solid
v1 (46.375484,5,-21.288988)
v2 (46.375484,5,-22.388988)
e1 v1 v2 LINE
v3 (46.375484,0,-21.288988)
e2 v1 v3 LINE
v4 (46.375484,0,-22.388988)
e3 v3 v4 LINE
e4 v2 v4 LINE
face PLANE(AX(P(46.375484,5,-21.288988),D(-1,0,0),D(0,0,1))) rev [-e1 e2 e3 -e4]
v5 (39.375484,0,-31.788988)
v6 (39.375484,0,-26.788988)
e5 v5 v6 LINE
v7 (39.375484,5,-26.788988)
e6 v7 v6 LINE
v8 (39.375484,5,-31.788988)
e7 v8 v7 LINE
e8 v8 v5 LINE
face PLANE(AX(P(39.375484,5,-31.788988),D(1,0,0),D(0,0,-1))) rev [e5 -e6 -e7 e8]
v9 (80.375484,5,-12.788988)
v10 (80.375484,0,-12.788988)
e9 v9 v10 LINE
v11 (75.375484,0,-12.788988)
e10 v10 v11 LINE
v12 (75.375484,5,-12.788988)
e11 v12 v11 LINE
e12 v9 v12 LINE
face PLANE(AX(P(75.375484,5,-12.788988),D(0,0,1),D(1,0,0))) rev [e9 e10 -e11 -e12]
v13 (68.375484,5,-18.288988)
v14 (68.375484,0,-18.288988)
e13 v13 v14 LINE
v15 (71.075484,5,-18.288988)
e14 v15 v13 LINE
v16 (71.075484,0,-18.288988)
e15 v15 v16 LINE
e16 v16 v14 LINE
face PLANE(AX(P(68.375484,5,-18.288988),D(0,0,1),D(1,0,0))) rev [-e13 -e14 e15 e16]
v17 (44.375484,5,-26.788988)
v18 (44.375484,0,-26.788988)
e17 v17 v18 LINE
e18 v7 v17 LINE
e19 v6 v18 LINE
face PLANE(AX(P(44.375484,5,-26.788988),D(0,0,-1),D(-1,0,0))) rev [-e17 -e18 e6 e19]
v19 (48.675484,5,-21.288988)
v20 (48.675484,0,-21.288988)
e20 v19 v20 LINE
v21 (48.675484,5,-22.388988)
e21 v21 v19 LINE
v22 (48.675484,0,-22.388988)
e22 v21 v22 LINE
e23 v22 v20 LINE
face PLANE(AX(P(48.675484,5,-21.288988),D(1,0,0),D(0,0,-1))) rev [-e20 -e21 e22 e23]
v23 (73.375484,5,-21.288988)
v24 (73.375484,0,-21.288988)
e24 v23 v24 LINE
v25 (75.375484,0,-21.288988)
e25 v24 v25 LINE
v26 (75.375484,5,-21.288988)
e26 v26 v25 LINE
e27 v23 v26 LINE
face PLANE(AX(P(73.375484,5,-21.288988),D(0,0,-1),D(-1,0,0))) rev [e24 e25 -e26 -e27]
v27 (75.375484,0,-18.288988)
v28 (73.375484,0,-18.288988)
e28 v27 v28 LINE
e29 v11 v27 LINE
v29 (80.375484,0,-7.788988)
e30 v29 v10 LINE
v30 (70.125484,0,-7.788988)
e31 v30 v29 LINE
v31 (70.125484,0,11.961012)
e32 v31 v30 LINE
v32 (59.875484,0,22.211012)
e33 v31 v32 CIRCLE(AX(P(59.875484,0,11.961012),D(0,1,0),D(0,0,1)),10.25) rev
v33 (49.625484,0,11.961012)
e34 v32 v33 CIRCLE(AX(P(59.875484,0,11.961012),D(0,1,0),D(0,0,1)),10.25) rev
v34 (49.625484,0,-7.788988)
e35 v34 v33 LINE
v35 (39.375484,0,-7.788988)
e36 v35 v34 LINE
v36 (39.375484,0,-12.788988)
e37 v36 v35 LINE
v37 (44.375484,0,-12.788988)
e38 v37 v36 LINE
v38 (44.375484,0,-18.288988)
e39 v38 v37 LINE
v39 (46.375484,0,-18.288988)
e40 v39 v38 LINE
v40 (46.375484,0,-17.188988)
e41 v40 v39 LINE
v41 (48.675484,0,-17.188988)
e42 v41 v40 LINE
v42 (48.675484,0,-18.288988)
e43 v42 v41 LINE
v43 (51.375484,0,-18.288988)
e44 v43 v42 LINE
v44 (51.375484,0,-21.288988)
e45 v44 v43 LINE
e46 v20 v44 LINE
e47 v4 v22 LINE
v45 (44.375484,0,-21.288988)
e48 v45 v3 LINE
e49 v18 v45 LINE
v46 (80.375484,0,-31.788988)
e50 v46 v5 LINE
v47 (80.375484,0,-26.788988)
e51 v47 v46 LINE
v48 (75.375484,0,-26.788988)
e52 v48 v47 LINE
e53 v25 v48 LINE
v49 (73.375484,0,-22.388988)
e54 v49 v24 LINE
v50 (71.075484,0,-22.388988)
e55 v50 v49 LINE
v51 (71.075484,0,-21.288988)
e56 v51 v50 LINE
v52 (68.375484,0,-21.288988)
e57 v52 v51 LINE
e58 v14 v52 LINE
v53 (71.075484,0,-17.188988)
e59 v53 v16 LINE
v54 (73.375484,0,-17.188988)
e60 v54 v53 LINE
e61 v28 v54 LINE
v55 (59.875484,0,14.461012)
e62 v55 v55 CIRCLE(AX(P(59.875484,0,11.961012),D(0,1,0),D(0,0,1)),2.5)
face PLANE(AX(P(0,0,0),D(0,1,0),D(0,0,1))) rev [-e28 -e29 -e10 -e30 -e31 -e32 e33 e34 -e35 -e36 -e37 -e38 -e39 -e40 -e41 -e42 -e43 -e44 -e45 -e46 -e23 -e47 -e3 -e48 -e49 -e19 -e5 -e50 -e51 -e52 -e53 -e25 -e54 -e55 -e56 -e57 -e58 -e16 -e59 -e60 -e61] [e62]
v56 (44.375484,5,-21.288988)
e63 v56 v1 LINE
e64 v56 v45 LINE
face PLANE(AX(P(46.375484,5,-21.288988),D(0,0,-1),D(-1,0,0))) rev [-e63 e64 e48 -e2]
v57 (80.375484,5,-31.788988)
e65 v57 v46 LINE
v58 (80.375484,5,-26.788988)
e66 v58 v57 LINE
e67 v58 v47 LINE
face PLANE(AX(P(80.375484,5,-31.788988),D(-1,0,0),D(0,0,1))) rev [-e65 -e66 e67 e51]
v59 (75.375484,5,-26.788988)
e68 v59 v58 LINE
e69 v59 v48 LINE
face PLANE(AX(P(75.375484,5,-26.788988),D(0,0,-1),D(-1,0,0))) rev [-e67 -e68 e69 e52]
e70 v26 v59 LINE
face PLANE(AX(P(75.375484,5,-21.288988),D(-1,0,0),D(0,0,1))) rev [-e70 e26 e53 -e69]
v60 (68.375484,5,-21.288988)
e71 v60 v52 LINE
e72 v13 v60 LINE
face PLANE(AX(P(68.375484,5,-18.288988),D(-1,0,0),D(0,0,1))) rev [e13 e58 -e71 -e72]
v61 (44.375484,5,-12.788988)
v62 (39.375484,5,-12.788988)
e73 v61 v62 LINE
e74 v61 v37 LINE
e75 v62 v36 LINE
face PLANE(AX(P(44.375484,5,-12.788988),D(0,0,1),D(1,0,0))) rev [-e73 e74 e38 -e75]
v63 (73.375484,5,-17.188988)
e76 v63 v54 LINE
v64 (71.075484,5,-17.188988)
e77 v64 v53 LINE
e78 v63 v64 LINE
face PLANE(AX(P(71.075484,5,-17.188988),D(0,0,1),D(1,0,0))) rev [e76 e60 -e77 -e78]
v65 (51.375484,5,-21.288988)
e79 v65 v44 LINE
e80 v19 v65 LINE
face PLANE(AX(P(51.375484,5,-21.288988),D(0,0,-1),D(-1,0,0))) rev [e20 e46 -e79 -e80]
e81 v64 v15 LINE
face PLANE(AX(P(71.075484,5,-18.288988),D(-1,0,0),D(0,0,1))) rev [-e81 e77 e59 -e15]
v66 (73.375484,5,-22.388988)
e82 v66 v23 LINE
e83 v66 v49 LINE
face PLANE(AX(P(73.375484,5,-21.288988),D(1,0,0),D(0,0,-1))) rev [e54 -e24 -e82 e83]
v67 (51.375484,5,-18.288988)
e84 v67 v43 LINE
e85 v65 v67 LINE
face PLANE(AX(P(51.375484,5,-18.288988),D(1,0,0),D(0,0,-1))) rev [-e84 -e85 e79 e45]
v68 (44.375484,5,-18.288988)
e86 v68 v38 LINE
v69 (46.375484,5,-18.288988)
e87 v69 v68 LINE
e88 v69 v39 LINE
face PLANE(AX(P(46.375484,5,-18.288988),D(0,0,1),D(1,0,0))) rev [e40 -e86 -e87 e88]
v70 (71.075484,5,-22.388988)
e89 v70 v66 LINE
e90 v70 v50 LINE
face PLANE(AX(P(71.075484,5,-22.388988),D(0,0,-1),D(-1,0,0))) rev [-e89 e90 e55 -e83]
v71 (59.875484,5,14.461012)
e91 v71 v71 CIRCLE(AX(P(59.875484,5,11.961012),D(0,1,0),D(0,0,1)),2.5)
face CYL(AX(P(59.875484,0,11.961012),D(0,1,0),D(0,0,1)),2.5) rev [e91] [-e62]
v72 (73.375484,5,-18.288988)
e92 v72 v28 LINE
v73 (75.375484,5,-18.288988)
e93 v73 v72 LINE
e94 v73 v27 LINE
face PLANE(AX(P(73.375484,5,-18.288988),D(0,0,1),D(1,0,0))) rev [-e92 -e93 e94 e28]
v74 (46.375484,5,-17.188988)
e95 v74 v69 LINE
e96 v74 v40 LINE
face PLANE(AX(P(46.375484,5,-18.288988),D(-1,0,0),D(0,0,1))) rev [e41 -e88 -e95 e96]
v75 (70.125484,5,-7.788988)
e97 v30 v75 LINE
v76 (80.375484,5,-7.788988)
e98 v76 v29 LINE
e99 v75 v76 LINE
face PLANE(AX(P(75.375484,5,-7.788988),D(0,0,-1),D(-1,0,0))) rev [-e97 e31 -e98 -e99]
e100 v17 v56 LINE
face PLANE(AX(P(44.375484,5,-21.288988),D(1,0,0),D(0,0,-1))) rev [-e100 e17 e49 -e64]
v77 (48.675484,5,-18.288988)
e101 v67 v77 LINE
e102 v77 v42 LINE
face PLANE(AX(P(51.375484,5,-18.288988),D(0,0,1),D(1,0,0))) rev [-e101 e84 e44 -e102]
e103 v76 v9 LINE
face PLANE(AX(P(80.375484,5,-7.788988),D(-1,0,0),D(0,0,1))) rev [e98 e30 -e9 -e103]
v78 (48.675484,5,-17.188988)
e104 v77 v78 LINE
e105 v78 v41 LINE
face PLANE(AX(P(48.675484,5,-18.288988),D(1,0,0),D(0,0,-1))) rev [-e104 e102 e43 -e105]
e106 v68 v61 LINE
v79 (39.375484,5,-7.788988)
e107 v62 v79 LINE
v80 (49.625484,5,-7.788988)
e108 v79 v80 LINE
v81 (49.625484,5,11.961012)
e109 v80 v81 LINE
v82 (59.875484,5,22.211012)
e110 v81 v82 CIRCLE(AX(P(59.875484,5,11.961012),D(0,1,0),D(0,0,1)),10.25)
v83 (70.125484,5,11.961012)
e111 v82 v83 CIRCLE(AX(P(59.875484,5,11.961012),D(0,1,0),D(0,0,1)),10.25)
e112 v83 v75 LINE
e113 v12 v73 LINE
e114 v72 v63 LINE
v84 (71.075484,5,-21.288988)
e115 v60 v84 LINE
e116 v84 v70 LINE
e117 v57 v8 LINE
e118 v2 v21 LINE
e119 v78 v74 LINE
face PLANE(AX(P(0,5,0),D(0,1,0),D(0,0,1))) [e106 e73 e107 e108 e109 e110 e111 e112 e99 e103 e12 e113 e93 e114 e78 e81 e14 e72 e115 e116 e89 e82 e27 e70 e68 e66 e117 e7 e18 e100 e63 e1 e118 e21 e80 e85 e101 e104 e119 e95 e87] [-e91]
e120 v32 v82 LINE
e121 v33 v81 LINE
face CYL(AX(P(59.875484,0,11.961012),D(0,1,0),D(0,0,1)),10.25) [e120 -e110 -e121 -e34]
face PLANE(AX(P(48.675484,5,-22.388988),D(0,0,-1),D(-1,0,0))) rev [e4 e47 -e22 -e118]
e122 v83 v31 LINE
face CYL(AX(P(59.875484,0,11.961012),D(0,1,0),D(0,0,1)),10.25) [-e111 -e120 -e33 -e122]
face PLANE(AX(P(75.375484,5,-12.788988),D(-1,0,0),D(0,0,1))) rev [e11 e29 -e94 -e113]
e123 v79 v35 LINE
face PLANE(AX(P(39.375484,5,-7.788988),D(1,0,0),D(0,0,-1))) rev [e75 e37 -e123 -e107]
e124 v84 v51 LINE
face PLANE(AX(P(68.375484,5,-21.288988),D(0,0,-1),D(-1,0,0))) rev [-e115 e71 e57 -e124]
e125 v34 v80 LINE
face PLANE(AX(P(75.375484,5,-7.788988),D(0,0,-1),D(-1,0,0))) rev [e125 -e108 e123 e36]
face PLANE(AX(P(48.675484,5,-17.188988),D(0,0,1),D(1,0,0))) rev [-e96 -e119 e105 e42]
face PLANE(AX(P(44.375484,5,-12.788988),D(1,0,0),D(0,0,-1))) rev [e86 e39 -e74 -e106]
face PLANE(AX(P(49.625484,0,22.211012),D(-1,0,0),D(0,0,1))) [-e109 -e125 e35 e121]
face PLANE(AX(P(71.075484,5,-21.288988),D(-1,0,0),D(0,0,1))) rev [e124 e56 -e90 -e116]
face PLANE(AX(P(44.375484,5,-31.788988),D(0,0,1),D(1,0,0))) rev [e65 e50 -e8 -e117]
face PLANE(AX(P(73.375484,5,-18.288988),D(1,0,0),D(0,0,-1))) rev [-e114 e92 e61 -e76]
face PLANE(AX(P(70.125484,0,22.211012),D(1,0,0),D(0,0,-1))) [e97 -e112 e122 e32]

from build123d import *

# Parameters (mm, degrees)
BOSS_EXTRUDE1_DEPTH = 5
SKETCH2_W           = 20.5
SKETCH2_H           = 30
SKETCH2_R           = 2.5
BOSS_EXTRUDE2_DEPTH = 5
FILLET1_R           = 10.25


with BuildPart() as part:
    # Sketch1 → Boss-Extrude1 (new body)
    with BuildSketch(Plane(origin=(0, 0, 0), x_dir=(1, 0, 0), z_dir=(0, 1, 0))):
        Polygon((44.375484097, 7.788988346), (75.375484097, 7.788988346), (80.375484097, 7.788988346), (80.375484097, 12.788988346), (75.375484097, 12.788988346), (75.375484097, 18.288988346), (73.375484097, 18.288988346), (73.375484097, 17.188988346), (71.075484097, 17.188988346), (71.075484097, 18.288988346), (68.375484097, 18.288988346), (68.375484097, 21.288988346), (71.075484097, 21.288988346), (71.075484097, 22.388988346), (73.375484097, 22.388988346), (73.375484097, 21.288988346), (75.375484097, 21.288988346), (75.375484097, 26.788988346), (80.375484097, 26.788988346), (80.375484097, 31.788988346), (75.375484097, 31.788988346), (44.375484097, 31.788988346), (39.375484097, 31.788988346), (39.375484097, 26.788988346), (44.375484097, 26.788988346), (44.375484097, 21.288988346), (46.375484097, 21.288988346), (46.375484097, 22.388988346), (48.675484097, 22.388988346), (48.675484097, 21.288988346), (51.375484097, 21.288988346), (51.375484097, 18.288988346), (48.675484097, 18.288988346), (48.675484097, 17.188988346), (46.375484097, 17.188988346), (46.375484097, 18.288988346), (44.375484097, 18.288988346), (44.375484097, 12.788988346), (39.375484097, 12.788988346), (39.375484097, 7.788988346), align=None)
    extrude(amount=BOSS_EXTRUDE1_DEPTH)

    # Sketch2 → Boss-Extrude2 (add)
    with BuildSketch(Plane(origin=(0, 5, 0), x_dir=(1, 0, 0), z_dir=(0, 1, 0))):
        with Locations((59.875484097, -7.211011654)):
            Rectangle(SKETCH2_W, SKETCH2_H)
        with Locations(Location((59.875484097, -11.961011654, 0), (0, 0, 270))):
            Circle(SKETCH2_R, mode=Mode.SUBTRACT)
    extrude(amount=-BOSS_EXTRUDE2_DEPTH)

    # Fillet1
    fillet1_edges = [part.edges().sort_by_distance(p)[0] for p in [
        (49.625484097, 2.5, 22.211011654),
        (70.125484097, 2.5, 22.211011654),
    ]]
    fillet(fillet1_edges, radius=FILLET1_R - 0.0001)  # a hair under: the kernel refuses the full size


solid = part.part
